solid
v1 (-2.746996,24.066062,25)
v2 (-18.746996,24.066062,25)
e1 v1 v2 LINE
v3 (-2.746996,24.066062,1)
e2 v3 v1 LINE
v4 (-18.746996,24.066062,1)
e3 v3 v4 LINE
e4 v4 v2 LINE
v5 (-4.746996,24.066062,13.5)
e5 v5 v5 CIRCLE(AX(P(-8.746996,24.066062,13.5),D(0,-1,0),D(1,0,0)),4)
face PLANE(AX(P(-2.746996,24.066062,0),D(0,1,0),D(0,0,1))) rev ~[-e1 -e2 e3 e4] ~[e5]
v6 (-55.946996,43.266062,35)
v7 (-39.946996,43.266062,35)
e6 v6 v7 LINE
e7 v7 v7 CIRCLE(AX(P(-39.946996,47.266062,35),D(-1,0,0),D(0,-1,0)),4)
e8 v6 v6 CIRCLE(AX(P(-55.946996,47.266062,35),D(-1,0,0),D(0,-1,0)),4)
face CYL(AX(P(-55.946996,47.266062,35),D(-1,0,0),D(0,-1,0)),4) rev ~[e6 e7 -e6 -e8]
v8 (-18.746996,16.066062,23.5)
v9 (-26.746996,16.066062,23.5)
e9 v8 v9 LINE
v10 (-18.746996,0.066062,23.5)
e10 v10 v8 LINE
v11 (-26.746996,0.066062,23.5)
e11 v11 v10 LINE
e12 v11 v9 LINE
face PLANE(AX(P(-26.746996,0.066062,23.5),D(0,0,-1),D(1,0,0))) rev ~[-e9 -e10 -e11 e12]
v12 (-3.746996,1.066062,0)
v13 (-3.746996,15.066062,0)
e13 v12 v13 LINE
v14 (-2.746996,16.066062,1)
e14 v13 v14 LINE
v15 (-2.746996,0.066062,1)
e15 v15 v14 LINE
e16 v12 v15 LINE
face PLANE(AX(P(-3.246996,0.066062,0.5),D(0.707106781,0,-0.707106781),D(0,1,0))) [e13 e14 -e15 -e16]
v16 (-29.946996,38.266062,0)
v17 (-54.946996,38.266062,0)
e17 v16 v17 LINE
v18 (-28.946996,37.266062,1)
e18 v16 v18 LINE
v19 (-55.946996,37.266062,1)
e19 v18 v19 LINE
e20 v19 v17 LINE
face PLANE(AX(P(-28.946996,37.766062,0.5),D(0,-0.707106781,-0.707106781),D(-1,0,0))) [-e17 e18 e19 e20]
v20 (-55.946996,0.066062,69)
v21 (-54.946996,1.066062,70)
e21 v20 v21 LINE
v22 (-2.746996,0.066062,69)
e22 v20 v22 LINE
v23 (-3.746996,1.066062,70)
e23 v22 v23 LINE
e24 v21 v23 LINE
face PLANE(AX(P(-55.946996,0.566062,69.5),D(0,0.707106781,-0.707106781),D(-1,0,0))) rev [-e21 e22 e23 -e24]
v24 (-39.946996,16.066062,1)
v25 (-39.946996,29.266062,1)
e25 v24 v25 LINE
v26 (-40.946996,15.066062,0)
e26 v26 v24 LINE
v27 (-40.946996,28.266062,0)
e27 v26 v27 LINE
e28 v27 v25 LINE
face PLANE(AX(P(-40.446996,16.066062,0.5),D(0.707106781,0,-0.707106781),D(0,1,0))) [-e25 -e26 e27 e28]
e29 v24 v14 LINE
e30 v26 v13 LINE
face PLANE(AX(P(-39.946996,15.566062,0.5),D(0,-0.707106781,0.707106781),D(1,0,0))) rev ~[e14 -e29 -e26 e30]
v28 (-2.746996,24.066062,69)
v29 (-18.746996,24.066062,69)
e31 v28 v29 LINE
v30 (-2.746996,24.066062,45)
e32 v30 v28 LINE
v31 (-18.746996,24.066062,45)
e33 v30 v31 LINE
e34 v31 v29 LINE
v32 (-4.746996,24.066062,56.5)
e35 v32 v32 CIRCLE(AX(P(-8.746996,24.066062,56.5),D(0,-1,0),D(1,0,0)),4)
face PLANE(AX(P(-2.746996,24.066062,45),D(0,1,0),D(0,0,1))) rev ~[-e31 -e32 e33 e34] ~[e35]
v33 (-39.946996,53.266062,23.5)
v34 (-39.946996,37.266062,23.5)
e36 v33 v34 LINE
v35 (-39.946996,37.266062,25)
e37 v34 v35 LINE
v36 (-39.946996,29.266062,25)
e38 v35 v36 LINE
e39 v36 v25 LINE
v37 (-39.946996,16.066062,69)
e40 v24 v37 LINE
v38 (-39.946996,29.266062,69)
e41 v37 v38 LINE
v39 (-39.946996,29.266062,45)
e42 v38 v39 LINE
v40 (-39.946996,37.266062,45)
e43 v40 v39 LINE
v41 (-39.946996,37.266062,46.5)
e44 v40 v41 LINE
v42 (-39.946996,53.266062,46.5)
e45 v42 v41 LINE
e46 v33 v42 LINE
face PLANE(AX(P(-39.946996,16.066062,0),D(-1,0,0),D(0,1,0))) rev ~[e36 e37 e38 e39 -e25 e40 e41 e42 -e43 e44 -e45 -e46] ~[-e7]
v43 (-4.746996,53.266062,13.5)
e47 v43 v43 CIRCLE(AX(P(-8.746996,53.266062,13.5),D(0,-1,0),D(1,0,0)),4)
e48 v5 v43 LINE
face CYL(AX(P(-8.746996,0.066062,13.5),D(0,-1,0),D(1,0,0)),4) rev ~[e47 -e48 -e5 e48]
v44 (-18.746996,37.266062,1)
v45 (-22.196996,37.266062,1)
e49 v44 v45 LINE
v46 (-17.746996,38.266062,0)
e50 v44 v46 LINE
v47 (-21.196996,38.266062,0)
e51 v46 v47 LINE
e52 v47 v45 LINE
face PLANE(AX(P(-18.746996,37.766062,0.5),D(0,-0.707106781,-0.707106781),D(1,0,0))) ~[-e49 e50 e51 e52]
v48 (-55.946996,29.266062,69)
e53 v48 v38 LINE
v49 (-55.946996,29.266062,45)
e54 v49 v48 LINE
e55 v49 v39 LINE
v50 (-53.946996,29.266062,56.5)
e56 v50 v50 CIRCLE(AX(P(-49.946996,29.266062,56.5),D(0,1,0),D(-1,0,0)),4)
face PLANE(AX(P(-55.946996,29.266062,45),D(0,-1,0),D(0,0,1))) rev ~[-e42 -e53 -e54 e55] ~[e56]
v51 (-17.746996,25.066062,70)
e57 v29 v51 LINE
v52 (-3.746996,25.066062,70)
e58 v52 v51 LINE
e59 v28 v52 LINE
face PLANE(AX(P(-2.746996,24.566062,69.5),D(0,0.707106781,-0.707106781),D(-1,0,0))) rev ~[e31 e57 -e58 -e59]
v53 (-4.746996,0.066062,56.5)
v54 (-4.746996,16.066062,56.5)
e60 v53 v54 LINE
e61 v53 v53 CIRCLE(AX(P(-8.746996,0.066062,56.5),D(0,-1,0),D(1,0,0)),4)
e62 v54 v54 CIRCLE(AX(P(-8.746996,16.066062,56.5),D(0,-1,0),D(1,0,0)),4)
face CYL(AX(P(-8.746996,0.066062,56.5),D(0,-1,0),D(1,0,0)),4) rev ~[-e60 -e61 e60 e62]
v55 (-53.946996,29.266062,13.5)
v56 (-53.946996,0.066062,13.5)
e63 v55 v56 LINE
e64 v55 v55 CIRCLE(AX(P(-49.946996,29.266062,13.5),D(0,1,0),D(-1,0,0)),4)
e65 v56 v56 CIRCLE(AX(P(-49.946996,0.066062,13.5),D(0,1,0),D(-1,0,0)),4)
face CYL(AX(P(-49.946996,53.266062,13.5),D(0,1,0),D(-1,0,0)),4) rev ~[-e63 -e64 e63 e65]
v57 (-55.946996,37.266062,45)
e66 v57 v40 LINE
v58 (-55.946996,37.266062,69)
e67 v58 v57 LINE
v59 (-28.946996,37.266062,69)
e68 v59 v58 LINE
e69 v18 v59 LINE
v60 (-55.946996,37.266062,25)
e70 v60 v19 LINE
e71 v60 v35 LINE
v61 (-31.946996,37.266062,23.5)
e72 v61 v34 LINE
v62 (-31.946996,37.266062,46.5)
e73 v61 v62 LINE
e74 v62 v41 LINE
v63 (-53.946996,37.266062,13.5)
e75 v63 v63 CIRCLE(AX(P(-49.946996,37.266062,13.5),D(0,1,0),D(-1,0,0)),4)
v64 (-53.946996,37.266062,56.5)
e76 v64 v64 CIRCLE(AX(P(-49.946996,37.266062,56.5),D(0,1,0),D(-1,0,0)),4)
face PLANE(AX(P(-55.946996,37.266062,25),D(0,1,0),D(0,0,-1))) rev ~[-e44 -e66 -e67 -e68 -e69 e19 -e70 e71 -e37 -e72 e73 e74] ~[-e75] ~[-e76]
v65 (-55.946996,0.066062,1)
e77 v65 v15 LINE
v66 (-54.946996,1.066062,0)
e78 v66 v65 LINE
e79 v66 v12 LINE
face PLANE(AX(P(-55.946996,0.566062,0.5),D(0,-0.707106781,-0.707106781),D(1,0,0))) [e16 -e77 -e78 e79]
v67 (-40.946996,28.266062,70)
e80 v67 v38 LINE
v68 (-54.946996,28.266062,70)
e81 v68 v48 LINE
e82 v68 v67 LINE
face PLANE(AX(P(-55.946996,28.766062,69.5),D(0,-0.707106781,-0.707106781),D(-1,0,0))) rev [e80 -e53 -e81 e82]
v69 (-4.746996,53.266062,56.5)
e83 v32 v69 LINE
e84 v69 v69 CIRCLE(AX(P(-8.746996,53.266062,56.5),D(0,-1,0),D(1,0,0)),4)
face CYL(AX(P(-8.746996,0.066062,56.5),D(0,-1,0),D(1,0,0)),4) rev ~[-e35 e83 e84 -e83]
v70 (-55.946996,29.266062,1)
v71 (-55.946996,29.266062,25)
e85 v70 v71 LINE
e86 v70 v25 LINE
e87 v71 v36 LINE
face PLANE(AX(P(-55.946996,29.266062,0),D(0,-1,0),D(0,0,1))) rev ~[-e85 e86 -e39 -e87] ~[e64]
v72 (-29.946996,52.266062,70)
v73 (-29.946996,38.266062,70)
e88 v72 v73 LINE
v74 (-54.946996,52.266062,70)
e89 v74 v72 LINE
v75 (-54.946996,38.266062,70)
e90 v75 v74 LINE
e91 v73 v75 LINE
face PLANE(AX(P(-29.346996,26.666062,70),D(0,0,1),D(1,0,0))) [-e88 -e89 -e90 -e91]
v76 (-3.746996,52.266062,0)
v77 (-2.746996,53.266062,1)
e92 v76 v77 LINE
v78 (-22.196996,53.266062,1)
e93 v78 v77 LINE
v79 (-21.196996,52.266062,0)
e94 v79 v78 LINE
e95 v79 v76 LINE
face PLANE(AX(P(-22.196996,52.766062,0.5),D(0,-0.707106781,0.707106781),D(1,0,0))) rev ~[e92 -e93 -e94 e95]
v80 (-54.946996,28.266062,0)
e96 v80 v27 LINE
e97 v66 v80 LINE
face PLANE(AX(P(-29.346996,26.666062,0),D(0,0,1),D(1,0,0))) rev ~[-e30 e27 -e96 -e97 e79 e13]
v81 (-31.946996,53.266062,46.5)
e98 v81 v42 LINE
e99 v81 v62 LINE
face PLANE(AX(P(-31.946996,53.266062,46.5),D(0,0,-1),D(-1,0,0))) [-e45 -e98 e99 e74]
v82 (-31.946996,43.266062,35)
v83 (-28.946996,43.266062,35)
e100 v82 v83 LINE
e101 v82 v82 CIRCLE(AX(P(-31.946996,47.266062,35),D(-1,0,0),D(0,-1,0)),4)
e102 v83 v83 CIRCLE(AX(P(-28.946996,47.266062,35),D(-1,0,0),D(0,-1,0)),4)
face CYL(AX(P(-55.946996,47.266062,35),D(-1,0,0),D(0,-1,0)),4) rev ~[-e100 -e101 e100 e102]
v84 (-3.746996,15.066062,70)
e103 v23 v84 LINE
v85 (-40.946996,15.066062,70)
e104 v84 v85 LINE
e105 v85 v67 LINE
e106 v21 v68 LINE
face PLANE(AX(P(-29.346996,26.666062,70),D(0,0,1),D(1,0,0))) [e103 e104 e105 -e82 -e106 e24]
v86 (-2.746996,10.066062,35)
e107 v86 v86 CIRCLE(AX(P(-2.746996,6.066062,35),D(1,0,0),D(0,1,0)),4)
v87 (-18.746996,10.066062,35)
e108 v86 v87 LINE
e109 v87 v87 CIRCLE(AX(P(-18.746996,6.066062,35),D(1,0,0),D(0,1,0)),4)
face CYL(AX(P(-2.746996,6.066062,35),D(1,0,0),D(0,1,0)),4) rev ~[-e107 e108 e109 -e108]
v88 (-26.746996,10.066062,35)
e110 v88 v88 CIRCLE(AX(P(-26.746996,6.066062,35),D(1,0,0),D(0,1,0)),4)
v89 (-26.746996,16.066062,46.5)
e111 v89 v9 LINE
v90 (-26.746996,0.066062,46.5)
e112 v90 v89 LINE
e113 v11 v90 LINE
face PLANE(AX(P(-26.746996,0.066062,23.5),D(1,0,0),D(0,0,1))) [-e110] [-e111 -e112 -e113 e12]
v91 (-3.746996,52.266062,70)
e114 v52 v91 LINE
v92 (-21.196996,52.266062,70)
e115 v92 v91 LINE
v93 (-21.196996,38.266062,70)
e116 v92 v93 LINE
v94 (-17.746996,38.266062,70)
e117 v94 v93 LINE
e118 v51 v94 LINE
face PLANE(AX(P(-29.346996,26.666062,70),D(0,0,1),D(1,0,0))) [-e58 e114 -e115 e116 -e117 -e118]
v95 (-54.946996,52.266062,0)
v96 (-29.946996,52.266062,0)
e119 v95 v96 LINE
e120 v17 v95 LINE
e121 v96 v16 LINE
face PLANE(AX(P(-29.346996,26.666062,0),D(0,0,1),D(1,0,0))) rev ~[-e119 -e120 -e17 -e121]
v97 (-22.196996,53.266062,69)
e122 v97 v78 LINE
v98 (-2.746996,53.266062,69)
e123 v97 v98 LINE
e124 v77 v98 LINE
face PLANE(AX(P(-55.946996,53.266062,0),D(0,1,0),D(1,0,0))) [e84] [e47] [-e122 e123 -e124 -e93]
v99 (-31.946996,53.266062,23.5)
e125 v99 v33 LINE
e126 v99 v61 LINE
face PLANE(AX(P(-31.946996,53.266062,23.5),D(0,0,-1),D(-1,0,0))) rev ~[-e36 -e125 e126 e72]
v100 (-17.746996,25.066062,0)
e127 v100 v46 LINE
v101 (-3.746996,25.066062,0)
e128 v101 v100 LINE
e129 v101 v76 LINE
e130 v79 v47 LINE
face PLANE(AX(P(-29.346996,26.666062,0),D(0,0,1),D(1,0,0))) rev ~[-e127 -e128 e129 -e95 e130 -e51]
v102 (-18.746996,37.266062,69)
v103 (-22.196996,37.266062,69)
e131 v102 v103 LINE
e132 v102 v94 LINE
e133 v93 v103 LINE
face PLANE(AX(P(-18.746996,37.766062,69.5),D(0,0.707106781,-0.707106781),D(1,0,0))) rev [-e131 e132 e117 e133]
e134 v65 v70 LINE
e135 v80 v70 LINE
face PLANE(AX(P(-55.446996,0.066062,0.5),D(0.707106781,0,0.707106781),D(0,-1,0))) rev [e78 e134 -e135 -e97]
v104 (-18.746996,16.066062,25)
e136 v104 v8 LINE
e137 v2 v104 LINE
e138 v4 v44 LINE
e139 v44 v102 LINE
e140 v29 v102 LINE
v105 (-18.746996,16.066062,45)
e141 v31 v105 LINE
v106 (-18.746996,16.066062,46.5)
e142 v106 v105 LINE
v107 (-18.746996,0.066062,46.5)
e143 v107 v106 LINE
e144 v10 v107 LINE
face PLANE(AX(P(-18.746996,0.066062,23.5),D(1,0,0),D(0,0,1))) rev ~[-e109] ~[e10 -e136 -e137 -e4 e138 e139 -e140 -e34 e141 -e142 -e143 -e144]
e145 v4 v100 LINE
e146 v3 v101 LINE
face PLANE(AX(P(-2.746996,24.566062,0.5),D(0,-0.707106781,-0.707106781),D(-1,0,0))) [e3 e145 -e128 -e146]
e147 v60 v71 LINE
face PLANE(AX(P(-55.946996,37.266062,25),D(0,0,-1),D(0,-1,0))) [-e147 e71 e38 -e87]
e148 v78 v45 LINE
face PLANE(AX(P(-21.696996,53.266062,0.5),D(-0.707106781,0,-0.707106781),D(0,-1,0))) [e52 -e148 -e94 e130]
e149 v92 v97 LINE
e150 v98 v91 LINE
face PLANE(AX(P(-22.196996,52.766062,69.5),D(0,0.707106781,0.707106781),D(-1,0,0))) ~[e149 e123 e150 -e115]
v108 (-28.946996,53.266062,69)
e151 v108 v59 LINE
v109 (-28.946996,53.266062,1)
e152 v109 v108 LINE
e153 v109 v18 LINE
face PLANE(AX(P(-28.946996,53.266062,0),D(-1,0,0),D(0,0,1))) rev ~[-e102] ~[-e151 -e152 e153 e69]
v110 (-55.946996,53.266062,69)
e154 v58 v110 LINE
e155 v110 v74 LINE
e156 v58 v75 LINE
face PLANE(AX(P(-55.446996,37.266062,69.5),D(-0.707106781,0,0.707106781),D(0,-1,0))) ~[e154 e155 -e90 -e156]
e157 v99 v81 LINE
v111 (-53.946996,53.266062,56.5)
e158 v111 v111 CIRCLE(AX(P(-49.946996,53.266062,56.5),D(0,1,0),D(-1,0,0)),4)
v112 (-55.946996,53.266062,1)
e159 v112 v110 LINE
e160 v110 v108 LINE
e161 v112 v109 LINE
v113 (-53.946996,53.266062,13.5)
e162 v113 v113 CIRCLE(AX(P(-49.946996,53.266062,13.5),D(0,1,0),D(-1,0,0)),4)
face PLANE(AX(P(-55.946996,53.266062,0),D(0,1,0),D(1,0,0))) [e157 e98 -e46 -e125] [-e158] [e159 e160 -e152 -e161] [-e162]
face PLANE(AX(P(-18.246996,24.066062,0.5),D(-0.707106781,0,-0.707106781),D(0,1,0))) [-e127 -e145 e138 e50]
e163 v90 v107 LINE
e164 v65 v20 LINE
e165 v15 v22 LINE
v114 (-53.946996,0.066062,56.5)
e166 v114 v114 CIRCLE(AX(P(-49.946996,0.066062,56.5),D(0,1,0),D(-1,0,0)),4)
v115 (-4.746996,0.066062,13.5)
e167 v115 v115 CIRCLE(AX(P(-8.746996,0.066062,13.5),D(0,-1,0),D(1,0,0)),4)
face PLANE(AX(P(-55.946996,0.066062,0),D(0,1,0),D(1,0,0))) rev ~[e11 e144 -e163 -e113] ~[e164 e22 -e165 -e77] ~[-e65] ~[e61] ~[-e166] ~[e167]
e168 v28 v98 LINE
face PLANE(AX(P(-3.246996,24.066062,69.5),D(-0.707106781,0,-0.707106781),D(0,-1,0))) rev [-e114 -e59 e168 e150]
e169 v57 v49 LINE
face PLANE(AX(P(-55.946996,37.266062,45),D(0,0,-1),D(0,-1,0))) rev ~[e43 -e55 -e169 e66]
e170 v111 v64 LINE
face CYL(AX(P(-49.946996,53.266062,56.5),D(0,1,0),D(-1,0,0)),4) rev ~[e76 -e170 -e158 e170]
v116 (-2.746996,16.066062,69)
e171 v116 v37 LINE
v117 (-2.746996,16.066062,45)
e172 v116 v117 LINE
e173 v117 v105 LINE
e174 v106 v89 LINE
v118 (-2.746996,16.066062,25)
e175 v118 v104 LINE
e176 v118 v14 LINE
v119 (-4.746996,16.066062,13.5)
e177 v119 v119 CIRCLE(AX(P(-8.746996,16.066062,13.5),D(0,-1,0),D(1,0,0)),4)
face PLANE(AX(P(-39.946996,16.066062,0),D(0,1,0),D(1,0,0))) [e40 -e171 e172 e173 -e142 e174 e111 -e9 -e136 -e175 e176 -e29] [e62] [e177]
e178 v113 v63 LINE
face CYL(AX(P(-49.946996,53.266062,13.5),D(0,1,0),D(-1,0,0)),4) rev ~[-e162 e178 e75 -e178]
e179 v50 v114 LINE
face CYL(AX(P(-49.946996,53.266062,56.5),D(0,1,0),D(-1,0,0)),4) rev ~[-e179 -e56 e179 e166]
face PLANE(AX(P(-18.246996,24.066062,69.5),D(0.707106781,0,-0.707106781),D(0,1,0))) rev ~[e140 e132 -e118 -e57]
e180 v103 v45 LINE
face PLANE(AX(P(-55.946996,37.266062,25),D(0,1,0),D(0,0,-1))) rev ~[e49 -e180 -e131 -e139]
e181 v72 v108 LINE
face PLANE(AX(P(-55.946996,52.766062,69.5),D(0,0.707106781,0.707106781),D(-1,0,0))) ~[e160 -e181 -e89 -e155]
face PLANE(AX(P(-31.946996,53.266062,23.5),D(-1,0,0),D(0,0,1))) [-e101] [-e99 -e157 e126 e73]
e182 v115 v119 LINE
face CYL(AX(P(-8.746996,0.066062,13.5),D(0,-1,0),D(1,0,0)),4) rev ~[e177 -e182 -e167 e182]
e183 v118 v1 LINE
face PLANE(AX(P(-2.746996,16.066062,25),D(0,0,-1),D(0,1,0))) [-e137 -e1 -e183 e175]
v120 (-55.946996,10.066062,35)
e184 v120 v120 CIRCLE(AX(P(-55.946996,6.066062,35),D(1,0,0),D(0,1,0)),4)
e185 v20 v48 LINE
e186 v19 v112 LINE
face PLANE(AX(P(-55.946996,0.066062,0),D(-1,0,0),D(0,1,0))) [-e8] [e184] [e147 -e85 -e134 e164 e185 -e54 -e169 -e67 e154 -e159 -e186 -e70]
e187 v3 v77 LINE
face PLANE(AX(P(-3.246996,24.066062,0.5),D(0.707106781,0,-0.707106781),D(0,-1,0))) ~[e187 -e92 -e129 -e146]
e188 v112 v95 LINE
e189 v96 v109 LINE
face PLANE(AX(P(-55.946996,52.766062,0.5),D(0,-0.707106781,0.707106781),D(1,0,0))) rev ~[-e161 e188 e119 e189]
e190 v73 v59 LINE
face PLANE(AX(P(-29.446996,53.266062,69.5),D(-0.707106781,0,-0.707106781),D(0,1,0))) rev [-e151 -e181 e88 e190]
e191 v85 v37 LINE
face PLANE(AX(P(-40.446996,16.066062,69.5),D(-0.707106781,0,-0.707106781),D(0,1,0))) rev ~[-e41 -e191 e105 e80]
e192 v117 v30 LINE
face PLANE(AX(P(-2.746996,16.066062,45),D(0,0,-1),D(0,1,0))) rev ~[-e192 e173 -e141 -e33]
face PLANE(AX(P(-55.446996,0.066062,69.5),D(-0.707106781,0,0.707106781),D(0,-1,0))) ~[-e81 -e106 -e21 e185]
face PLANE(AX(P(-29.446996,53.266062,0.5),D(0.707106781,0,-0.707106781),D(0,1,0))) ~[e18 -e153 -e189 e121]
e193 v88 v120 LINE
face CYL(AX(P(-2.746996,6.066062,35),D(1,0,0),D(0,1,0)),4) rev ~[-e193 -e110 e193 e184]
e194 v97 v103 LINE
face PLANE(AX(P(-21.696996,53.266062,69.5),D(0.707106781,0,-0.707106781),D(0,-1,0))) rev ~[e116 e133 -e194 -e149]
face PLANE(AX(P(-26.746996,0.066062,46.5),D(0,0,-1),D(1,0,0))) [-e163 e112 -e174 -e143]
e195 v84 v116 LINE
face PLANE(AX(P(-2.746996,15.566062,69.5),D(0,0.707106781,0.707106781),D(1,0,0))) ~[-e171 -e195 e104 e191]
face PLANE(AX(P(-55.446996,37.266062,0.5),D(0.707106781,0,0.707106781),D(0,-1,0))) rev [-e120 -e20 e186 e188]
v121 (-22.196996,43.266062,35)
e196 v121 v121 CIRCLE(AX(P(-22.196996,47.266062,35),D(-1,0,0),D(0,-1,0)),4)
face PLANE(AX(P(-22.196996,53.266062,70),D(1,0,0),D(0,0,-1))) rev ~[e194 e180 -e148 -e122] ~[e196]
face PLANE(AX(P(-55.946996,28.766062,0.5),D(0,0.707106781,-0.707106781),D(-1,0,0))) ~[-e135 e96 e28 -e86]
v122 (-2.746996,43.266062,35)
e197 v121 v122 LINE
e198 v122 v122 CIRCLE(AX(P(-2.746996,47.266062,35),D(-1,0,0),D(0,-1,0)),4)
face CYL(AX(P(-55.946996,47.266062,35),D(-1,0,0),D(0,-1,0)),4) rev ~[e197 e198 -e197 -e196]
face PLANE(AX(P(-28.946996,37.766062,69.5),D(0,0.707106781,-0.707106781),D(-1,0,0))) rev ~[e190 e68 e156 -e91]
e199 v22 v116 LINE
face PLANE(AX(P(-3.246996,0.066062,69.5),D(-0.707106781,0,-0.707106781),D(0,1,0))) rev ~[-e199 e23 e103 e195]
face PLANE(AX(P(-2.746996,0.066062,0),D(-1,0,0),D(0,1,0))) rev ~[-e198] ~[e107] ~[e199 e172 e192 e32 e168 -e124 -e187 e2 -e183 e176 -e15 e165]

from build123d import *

# Parameters (mm, degrees)
F0_W      = 53.2
F0_H      = 53.2
F0_W_2    = 21.2
F0_H_2    = 21.2
F1_DEPTH  = 70
F2_W      = 8
F2_H      = 7.5
F2_H_2    = 8
F2_H_3    = 2
F4_DEPTH  = 24
F3_W      = 8
F3_H      = 23
F5_DEPTH  = 25
F2_R      = 4
F6_DEPTH  = 90
F7_W      = 8
F7_H      = 7.5
F7_H_2    = 2
F7_H_3    = 8
F8_DEPTH  = 25
F3_R      = 4
F9_DEPTH  = 100
F7_R      = 4
F10_DEPTH = 90
F11_W     = 8
F11_H     = 23
F12_DEPTH = 25
F11_R     = 4
F13_DEPTH = 90
F15_DEPTH = 25
F16_SIZE  = 1


# Not quite as in the source:
# - a feature names something its author has since deleted; it is built from what else it names


with BuildPart() as f1:
    # F0 (on Top) → F1 (new body)
    with BuildSketch(Plane.XY):
        with Locations((-29.3469955068, 26.6660622075)):
            Rectangle(F0_W, F0_H)
        with Locations((-29.3469955068, 26.6660622075)):
            Rectangle(F0_W_2, F0_H_2, mode=Mode.SUBTRACT)
    extrude(amount=F1_DEPTH)

    # F2 (on face) → F4 (cut)
    with BuildSketch(Plane(origin=(-55.9469955068, 0, 0), x_dir=(0, -1, 0), z_dir=(-1, 0, 0))):
        with Locations((-33.2660622075, 48.75)):
            Rectangle(F2_W, F2_H)
        with Locations((-33.2660622075, 56.5)):
            Rectangle(F2_W, F2_H_2)
        with Locations((-33.2660622075, 64.25)):
            Rectangle(F2_W, F2_H)
        with Locations((-33.2660622075, 69)):
            Rectangle(F2_W, F2_H_3)
        with Locations((-33.2660622075, 1)):
            Rectangle(F2_W, F2_H_3)
        with Locations((-33.2660622075, 5.75)):
            Rectangle(F2_W, F2_H)
        with Locations((-33.2660622075, 13.5)):
            Rectangle(F2_W, F2_H_2)
        with Locations((-33.2660622075, 21.25)):
            Rectangle(F2_W, F2_H)
    extrude(amount=-F4_DEPTH, mode=Mode.SUBTRACT)

    # F3 (on face) → F5 (cut)
    with BuildSketch(Plane(origin=(0, 53.2660622075, 0), x_dir=(-1, 0, 0), z_dir=(0, 1, 0))):
        with Locations((35.9469955068, 35)):
            Rectangle(F3_W, F3_H)
    extrude(amount=-F5_DEPTH, mode=Mode.SUBTRACT)

    # F2 (on face) → F6 (cut)
    with BuildSketch(Plane(origin=(-55.9469955068, 0, 0), x_dir=(0, -1, 0), z_dir=(-1, 0, 0))):
        with Locations((-47.2660622075, 35)):
            Circle(F2_R)
    extrude(amount=-F6_DEPTH, mode=Mode.SUBTRACT)

    # F7 (on face) → F8 (cut)
    with BuildSketch(Plane.YZ.offset(-2.7469955068)):
        with Locations((20.0660622075, 48.75)):
            Rectangle(F7_W, F7_H)
        with Locations((20.0660622075, 69)):
            Rectangle(F7_W, F7_H_2)
        with Locations((20.0660622075, 21.25)):
            Rectangle(F7_W, F7_H)
        with Locations((20.0660622075, 1)):
            Rectangle(F7_W, F7_H_2)
        with Locations((20.0660622075, 56.5)):
            Rectangle(F7_W, F7_H_3)
        with Locations((20.0660622075, 64.25)):
            Rectangle(F7_W, F7_H)
        with Locations((20.0660622075, 13.5)):
            Rectangle(F7_W, F7_H_3)
        with Locations((20.0660622075, 5.75)):
            Rectangle(F7_W, F7_H)
    extrude(amount=-F8_DEPTH, mode=Mode.SUBTRACT)

    # F3 (on face) → F9 (cut)
    with BuildSketch(Plane(origin=(0, 53.2660622075, 0), x_dir=(-1, 0, 0), z_dir=(0, 1, 0))):
        with Locations((49.9469955068, 56.5)):
            Circle(F3_R)
        with Locations((49.9469955068, 13.5)):
            Circle(F3_R)
    extrude(amount=-F9_DEPTH, mode=Mode.SUBTRACT)

    # F7 (on face) → F10 (cut)
    with BuildSketch(Plane.YZ.offset(-2.7469955068)):
        with Locations((6.0660622075, 35)):
            Circle(F7_R)
    extrude(amount=-F10_DEPTH, mode=Mode.SUBTRACT)

    # F11 (on face) → F12 (cut)
    with BuildSketch(Plane.XZ.offset(-0.0660622075)):
        with Locations((-22.7469955068, 35)):
            Rectangle(F11_W, F11_H)
    extrude(amount=-F12_DEPTH, mode=Mode.SUBTRACT)

    # F11 (on face) → F13 (cut)
    with BuildSketch(Plane.XZ.offset(-0.0660622075)):
        with Locations((-8.7469955068, 13.5)):
            Circle(F11_R)
        with Locations((-8.7469955068, 56.5)):
            Circle(F11_R)
    extrude(amount=-F13_DEPTH, mode=Mode.SUBTRACT)

    # F14 (on face) → F15 (cut)
    with BuildSketch(Plane(origin=(0, 53.2660622075, 0), x_dir=(-1, 0, 0), z_dir=(0, 1, 0))):
        Polygon((28.9469955068, 0), (22.1969955068, 17.5), (22.1969955068, 0), align=None)
        Polygon((27.4469955068, 35), (22.1969955068, 45.5), (22.1969955068, 24.5), align=None)
        Polygon((28.9469955068, 17.5), (24.8022586647, 17.5), (28.9469955068, 8.75), align=None)
        Polygon((28.9469955068, 52.5), (28.9469955068, 61.25), (24.8022586647, 52.5), align=None)
        Polygon((22.1969955068, 23), (24.8022586647, 17.5), (28.9469955068, 17.5), (28.9469955068, 33.5), align=None)
        Polygon((28.9469955068, 52.5), (24.8022586647, 52.5), (22.1969955068, 47), (28.9469955068, 36.5), align=None)
        Polygon((28.9469955068, 36.5), (22.1969955068, 47), (22.1969955068, 45.5), (27.4469955068, 35), (22.1969955068, 24.5), (22.1969955068, 23), (28.9469955068, 33.5), align=None)
        Polygon((24.8022586647, 17.5), (22.1969955068, 17.5), (28.9469955068, 0), (28.9469955068, 8.75), align=None)
        Polygon((24.8022586647, 52.5), (22.1969955068, 52.5), (22.1969955068, 47), align=None)
        Polygon((22.1969955068, 23), (22.1969955068, 17.5), (24.8022586647, 17.5), align=None)
        Polygon((28.9469955068, 70), (22.1969955068, 70), (22.1969955068, 52.5), align=None)
        Polygon((28.9469955068, 61.25), (28.9469955068, 70), (22.1969955068, 52.5), (24.8022586647, 52.5), align=None)
    extrude(amount=-F15_DEPTH, mode=Mode.SUBTRACT)

    # F16
    f16_edges = [f1.edges().sort_by_distance(p)[0] for p in [
        (-28.946996, 45.266062, 0),
        (-42.446996, 37.266062, 0),
        (-55.946996, 45.266062, 0),
        (-42.446996, 53.266062, 0),
        (-10.746996, 24.066062, 0),
        (-18.746996, 30.666062, 0),
        (-20.471996, 37.266062, 0),
        (-22.196996, 45.266062, 0),
        (-12.471996, 53.266062, 0),
        (-2.746996, 38.666062, 0),
        (-29.346996, 0.066062, 0),
        (-2.746996, 8.066062, 0),
        (-21.346996, 16.066062, 0),
        (-39.946996, 22.666062, 0),
        (-47.946996, 29.266062, 0),
        (-55.946996, 14.666062, 0),
        (-28.946996, 45.266062, 70),
        (-42.446996, 37.266062, 70),
        (-55.946996, 45.266062, 70),
        (-42.446996, 53.266062, 70),
        (-29.346996, 0.066062, 70),
        (-2.746996, 8.066062, 70),
        (-21.346996, 16.066062, 70),
        (-39.946996, 22.666062, 70),
        (-47.946996, 29.266062, 70),
        (-55.946996, 14.666062, 70),
        (-10.746996, 24.066062, 70),
        (-18.746996, 30.666062, 70),
        (-20.471996, 37.266062, 70),
        (-22.196996, 45.266062, 70),
        (-12.471996, 53.266062, 70),
        (-2.746996, 38.666062, 70),
    ]]
    chamfer(f16_edges, length=F16_SIZE)


solid = f1.part
